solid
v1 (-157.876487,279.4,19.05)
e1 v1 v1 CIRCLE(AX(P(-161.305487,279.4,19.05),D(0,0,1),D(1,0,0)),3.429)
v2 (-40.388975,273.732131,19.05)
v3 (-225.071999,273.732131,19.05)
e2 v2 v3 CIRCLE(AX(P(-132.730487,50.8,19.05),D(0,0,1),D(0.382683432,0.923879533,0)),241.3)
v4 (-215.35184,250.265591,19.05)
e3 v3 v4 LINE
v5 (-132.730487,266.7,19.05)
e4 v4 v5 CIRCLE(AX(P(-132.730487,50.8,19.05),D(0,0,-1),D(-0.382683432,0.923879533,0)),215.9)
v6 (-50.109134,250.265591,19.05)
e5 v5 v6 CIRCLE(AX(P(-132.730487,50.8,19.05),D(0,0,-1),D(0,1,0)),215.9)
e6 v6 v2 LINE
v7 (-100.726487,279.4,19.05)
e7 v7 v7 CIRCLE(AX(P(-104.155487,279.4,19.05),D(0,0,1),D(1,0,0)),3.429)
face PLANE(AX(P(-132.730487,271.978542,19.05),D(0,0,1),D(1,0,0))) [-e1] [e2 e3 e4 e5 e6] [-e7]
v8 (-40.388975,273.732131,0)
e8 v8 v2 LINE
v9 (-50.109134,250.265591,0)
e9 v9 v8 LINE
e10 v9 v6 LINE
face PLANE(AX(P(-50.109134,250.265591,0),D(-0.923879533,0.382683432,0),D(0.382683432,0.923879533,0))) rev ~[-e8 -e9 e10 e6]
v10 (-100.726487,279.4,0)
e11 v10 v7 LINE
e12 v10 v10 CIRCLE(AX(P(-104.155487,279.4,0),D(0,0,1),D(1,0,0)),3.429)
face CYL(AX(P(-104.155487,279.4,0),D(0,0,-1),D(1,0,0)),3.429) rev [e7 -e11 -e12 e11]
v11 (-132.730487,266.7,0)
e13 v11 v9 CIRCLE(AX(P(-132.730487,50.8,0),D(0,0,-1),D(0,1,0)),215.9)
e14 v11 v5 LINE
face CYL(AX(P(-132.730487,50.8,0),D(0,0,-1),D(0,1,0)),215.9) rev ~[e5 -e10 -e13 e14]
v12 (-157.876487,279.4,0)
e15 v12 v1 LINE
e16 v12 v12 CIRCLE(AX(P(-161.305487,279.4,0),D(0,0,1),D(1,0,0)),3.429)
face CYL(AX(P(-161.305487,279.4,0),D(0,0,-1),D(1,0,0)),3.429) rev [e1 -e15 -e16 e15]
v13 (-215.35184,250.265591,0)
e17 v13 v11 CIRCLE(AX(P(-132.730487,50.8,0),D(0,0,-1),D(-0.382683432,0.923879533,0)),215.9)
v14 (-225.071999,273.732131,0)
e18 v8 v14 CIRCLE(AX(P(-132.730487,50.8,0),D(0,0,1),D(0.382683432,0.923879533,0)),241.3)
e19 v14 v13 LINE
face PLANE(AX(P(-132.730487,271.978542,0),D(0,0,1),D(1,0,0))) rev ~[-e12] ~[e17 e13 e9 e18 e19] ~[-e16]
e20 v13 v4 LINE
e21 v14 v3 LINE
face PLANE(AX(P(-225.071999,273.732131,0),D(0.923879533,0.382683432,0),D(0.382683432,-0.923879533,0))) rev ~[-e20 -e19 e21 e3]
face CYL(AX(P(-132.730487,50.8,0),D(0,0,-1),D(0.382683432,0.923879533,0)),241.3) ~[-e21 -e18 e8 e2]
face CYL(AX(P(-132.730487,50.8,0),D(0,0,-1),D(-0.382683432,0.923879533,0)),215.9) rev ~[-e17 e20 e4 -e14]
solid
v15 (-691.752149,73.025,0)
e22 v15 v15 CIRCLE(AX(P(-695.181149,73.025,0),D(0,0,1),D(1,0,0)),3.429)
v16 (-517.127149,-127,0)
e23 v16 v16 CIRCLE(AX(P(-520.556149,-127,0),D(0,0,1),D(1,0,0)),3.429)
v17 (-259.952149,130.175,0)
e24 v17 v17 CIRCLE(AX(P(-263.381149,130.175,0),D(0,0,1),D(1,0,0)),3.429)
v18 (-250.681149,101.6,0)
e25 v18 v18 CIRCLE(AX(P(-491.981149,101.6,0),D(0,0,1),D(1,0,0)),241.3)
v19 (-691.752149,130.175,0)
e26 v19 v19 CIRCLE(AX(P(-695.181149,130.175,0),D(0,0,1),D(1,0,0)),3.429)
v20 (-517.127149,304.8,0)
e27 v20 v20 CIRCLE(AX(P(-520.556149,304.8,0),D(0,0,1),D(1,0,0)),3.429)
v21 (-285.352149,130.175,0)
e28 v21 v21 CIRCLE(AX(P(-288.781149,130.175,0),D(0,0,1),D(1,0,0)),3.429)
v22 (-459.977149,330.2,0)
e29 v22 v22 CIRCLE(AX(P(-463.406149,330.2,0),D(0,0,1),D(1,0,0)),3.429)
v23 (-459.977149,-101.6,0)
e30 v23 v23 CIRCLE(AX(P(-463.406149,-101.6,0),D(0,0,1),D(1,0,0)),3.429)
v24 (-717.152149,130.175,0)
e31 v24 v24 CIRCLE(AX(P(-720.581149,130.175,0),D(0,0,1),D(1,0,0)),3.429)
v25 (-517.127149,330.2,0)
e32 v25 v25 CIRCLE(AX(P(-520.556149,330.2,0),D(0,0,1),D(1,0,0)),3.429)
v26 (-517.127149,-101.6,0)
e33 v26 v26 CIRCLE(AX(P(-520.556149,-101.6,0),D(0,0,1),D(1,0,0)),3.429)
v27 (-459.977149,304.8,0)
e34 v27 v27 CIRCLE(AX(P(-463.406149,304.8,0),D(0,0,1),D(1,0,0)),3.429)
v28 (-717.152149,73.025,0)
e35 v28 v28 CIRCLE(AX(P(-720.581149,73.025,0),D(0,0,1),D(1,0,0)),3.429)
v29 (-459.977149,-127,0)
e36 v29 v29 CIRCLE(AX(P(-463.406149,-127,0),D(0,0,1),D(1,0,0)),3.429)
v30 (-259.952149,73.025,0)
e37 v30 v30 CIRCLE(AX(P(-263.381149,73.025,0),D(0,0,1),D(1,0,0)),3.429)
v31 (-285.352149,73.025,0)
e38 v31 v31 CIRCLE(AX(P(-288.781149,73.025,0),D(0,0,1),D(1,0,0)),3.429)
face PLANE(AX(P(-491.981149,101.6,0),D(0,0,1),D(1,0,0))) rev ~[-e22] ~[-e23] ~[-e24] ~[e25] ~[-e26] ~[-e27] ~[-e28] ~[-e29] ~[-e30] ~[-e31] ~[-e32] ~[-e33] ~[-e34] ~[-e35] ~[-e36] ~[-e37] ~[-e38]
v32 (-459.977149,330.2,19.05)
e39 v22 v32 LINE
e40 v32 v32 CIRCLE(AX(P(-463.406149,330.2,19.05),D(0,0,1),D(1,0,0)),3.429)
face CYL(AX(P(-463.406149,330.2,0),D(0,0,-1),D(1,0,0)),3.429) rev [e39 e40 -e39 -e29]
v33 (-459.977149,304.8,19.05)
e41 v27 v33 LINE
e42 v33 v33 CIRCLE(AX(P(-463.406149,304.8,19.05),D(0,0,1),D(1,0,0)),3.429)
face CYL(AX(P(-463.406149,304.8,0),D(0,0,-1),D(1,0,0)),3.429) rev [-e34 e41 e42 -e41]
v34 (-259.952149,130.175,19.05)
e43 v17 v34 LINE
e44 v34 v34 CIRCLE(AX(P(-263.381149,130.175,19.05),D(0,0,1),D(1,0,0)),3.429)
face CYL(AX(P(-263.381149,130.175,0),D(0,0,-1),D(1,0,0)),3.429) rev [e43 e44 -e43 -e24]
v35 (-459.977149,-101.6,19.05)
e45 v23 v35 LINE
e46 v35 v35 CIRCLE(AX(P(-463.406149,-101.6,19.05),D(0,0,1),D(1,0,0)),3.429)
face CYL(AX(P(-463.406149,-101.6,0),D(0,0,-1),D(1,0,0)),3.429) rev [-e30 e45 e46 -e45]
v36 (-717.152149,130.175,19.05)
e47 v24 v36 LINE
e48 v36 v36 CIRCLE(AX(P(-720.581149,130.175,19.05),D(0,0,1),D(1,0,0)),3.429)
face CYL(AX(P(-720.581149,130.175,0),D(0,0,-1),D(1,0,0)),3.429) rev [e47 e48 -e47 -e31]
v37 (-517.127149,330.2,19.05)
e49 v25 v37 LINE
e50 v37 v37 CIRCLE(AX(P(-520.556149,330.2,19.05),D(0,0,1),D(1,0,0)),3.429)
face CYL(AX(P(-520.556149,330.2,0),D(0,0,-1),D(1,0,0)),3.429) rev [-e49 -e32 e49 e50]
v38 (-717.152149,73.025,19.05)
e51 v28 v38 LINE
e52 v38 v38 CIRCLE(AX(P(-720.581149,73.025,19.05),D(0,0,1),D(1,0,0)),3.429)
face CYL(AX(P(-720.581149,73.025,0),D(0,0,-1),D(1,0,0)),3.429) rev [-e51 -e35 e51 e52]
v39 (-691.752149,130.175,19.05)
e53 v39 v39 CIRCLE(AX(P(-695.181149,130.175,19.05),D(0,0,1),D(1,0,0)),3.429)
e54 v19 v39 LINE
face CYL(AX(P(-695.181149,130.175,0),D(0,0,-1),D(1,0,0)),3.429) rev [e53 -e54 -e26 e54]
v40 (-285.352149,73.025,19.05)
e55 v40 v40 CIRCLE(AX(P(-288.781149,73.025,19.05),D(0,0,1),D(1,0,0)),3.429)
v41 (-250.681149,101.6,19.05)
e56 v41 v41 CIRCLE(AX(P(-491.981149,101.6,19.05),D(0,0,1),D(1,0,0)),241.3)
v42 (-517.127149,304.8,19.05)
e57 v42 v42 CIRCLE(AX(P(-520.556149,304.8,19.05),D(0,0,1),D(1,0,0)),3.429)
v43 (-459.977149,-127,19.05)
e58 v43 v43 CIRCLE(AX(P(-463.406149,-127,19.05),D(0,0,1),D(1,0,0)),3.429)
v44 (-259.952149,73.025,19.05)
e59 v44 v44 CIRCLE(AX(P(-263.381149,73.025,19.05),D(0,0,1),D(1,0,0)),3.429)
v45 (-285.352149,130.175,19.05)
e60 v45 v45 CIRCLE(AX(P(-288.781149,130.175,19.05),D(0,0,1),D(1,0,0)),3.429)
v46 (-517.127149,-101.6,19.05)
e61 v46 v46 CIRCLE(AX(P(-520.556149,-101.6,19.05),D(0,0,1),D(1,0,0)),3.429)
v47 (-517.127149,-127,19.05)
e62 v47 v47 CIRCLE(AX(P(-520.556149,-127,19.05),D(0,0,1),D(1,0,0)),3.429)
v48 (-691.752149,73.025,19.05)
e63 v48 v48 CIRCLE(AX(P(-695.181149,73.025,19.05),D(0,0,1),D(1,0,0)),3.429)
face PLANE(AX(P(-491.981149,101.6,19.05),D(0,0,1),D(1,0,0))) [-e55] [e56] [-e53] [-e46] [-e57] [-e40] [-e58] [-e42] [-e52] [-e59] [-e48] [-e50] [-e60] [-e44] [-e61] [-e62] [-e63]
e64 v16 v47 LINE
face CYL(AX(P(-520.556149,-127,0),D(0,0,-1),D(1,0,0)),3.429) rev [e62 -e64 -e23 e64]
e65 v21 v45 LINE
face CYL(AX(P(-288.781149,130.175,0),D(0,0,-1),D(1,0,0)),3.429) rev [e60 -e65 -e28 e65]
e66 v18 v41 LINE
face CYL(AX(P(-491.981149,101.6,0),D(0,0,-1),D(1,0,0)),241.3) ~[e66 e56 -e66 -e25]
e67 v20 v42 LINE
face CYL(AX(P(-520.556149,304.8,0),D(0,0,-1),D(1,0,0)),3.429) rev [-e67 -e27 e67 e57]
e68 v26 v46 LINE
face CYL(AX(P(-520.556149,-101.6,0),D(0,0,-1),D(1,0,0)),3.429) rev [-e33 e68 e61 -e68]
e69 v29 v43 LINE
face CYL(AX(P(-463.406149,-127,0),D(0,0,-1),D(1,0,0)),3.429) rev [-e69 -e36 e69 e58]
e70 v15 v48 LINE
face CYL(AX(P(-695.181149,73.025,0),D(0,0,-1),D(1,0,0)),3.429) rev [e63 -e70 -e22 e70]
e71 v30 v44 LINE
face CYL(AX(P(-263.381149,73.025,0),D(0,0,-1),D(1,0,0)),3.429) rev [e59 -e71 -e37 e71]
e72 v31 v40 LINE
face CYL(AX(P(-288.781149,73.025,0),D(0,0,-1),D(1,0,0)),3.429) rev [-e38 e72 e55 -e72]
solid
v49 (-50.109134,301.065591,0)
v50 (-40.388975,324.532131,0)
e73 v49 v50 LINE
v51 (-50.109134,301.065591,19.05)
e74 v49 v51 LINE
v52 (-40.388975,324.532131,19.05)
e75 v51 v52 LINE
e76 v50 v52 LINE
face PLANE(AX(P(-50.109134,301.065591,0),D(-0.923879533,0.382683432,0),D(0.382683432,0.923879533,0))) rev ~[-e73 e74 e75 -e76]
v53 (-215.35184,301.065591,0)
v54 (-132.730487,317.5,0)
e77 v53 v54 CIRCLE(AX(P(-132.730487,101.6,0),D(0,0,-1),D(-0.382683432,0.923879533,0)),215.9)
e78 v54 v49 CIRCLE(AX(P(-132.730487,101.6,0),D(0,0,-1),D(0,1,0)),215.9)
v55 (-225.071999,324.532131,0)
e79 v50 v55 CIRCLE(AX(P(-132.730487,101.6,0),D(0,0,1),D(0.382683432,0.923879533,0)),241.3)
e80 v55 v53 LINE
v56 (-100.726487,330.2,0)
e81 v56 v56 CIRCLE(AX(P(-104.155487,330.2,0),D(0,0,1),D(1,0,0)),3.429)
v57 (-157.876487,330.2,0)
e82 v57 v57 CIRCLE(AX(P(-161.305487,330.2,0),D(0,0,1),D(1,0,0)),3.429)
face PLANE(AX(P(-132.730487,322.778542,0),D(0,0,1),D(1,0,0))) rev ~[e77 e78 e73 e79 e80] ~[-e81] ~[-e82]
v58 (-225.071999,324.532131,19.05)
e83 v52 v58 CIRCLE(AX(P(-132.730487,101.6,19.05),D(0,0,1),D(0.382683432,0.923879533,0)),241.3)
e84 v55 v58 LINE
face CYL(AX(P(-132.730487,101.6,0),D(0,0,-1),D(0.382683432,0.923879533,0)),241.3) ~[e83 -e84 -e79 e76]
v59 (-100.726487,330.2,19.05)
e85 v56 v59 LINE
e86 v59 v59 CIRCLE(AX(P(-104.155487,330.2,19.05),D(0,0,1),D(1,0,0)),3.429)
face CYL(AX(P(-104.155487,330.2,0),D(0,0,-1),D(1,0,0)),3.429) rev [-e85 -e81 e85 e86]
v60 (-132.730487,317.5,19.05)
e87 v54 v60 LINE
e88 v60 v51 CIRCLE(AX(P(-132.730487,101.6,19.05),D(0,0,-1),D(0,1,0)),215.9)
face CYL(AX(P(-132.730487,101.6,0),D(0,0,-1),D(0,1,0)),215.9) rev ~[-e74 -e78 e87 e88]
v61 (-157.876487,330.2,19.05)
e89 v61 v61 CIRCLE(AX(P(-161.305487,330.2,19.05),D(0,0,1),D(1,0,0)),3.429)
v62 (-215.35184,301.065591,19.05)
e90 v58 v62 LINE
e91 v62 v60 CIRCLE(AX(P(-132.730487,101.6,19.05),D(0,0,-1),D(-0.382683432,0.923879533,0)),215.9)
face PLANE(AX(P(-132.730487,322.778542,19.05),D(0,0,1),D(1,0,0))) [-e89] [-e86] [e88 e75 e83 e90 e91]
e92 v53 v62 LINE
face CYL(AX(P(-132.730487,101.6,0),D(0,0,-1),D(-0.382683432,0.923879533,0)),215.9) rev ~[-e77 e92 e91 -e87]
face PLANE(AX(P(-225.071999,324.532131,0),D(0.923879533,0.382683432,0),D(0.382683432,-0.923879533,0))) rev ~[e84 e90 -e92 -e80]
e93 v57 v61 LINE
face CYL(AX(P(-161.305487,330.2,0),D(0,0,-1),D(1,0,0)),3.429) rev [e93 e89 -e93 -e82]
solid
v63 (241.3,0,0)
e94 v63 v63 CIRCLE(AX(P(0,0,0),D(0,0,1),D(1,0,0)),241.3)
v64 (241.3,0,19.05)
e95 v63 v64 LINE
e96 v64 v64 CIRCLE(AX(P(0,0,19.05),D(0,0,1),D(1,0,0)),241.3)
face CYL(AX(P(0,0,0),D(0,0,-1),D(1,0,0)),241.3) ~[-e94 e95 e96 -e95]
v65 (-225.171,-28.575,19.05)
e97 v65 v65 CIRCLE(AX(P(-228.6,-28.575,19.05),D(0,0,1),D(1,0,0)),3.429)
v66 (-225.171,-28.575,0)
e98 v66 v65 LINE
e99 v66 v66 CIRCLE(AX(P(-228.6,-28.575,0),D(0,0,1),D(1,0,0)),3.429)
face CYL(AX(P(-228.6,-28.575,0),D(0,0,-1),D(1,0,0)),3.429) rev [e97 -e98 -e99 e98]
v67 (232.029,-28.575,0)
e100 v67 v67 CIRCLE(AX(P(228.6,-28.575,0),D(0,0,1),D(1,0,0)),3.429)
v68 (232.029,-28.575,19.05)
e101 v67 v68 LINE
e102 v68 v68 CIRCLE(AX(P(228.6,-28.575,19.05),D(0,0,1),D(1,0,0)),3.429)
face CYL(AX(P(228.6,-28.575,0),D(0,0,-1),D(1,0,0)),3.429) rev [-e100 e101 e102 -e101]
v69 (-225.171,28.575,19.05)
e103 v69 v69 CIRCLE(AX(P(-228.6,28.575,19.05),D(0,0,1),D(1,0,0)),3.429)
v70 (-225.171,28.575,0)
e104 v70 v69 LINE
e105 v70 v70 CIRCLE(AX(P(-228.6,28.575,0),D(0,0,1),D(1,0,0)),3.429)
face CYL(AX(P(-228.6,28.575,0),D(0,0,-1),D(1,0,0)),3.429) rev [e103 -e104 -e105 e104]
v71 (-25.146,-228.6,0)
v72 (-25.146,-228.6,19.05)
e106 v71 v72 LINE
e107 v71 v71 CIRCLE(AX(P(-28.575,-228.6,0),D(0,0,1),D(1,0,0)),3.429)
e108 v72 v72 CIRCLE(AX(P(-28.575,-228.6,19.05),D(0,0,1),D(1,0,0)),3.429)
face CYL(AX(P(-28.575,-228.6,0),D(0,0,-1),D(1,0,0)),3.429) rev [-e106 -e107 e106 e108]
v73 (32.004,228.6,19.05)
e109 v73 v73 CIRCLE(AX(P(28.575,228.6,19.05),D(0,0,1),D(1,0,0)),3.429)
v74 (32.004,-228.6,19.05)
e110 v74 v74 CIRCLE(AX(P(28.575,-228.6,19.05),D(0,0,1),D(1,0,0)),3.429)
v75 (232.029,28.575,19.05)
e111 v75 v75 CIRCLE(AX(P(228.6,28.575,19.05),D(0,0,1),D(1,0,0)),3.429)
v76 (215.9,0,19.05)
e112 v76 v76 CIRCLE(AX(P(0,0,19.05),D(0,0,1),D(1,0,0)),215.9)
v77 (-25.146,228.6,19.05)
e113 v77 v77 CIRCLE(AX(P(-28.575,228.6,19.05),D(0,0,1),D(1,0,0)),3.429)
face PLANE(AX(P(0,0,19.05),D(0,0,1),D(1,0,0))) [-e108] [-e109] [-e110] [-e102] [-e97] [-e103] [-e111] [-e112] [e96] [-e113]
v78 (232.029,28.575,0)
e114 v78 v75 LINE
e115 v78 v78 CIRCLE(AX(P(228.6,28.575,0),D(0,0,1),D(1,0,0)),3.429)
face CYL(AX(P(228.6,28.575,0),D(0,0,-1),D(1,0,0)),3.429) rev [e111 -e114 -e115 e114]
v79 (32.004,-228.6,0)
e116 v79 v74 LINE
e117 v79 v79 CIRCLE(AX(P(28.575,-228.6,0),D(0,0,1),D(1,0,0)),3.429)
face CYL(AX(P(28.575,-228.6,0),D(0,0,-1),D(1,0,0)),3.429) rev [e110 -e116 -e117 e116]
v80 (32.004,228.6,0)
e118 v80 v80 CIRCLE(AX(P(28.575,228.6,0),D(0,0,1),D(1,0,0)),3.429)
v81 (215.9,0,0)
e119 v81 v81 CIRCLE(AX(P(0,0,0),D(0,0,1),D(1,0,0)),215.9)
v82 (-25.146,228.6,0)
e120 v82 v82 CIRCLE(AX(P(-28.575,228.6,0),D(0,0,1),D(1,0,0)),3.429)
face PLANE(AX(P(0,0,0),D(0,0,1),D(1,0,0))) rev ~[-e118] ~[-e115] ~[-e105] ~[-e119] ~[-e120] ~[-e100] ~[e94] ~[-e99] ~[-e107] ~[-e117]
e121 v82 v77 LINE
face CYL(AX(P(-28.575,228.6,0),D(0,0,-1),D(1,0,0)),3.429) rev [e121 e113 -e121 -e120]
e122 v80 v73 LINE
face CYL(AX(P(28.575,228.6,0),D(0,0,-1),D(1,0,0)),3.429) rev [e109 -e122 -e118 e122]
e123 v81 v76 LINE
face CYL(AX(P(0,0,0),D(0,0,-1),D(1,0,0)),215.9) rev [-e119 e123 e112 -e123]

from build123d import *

# Parameters (mm, degrees)
F0_R     = 241.3
F0_R_2   = 3.429
F1_DEPTH = 19.05
F0_R_3   = 215.9


# Not quite as in the source:
# - a feature names something its author has since deleted; it is built from what else it names


with BuildPart() as f1:
    # F0 (on Top) → F1 (new body)
    with BuildSketch(Plane.XY):
        with Locations((-491.9811487198, 101.6)):
            Circle(F0_R)
        with Locations((-520.5561487198, -127)):
            Circle(F0_R_2, mode=Mode.SUBTRACT)
        with Locations((-520.5561487198, -101.6)):
            Circle(F0_R_2, mode=Mode.SUBTRACT)
        with Locations((-463.4061487198, -127)):
            Circle(F0_R_2, mode=Mode.SUBTRACT)
        with Locations((-463.4061487198, -101.6)):
            Circle(F0_R_2, mode=Mode.SUBTRACT)
        with Locations((-720.5811487198, 73.025)):
            Circle(F0_R_2, mode=Mode.SUBTRACT)
        with Locations((-695.1811487198, 73.025)):
            Circle(F0_R_2, mode=Mode.SUBTRACT)
        with Locations((-720.5811487198, 130.175)):
            Circle(F0_R_2, mode=Mode.SUBTRACT)
        with Locations((-695.1811487198, 130.175)):
            Circle(F0_R_2, mode=Mode.SUBTRACT)
        with Locations((-288.7811487198, 73.025)):
            Circle(F0_R_2, mode=Mode.SUBTRACT)
        with Locations((-263.3811487198, 73.025)):
            Circle(F0_R_2, mode=Mode.SUBTRACT)
        with Locations((-288.7811487198, 130.175)):
            Circle(F0_R_2, mode=Mode.SUBTRACT)
        with Locations((-263.3811487198, 130.175)):
            Circle(F0_R_2, mode=Mode.SUBTRACT)
        with Locations((-520.5561487198, 304.8)):
            Circle(F0_R_2, mode=Mode.SUBTRACT)
        with Locations((-520.5561487198, 330.2)):
            Circle(F0_R_2, mode=Mode.SUBTRACT)
        with Locations((-463.4061487198, 304.8)):
            Circle(F0_R_2, mode=Mode.SUBTRACT)
        with Locations((-463.4061487198, 330.2)):
            Circle(F0_R_2, mode=Mode.SUBTRACT)
    extrude(amount=F1_DEPTH)


with BuildPart() as f1b:
    # F0 (on Top) → F1, piece 2 (new body)
    with BuildSketch(Plane.XY):
        with BuildLine():
            ThreePointArc((-132.7304871559, 342.9), (-179.8057818584, 338.2634881613), (-225.0719993856, 324.532131195))
            Line((-225.0719993856, 324.532131195), (-215.3518402035, 301.0655910692))
            ThreePointArc((-215.3518402035, 301.0655910692), (-174.8504876792, 313.3515420391), (-132.7304871559, 317.5))
            ThreePointArc((-132.7304871559, 317.5), (-90.6104866326, 313.3515420391), (-50.1091341083, 301.0655910692))
            Line((-50.1091341083, 301.0655910692), (-40.3889749262, 324.532131195))
            ThreePointArc((-40.3889749262, 324.532131195), (-85.6551924534, 338.2634881613), (-132.7304871559, 342.9))
        make_face()
        with Locations((-161.3054871559, 330.2)):
            Circle(F0_R_2, mode=Mode.SUBTRACT)
        with Locations((-104.1554871559, 330.2)):
            Circle(F0_R_2, mode=Mode.SUBTRACT)
    extrude(amount=F1_DEPTH)


with BuildPart() as f1c:
    # F0 (on Top) → F1, piece 3 (new body)
    with BuildSketch(Plane.XY):
        with BuildLine():
            ThreePointArc((-132.7304871559, 292.1), (-179.8057818584, 287.4634881613), (-225.0719993856, 273.732131195))
            Line((-225.0719993856, 273.732131195), (-215.3518402035, 250.2655910692))
            ThreePointArc((-215.3518402035, 250.2655910692), (-174.8504876792, 262.5515420391), (-132.7304871559, 266.7))
            ThreePointArc((-132.7304871559, 266.7), (-90.6104866326, 262.5515420391), (-50.1091341083, 250.2655910692))
            Line((-50.1091341083, 250.2655910692), (-40.3889749262, 273.732131195))
            ThreePointArc((-40.3889749262, 273.732131195), (-85.6551924534, 287.4634881613), (-132.7304871559, 292.1))
        make_face()
        with Locations((-161.3054871559, 279.4)):
            Circle(F0_R_2, mode=Mode.SUBTRACT)
        with Locations((-104.1554871559, 279.4)):
            Circle(F0_R_2, mode=Mode.SUBTRACT)
    extrude(amount=F1_DEPTH)


with BuildPart() as f1d:
    # F0 (on Top) → F1, piece 4 (new body)
    with BuildSketch(Plane.XY):
        Circle(F0_R)
        with Locations((-28.575, -228.6)):
            Circle(F0_R_2, mode=Mode.SUBTRACT)
        with Locations((28.575, -228.6)):
            Circle(F0_R_2, mode=Mode.SUBTRACT)
        with Locations((-228.6, -28.575)):
            Circle(F0_R_2, mode=Mode.SUBTRACT)
        with Locations((-228.6, 28.575)):
            Circle(F0_R_2, mode=Mode.SUBTRACT)
        with Locations((228.6, -28.575)):
            Circle(F0_R_2, mode=Mode.SUBTRACT)
        Circle(F0_R_3, mode=Mode.SUBTRACT)
        with Locations((228.6, 28.575)):
            Circle(F0_R_2, mode=Mode.SUBTRACT)
        with Locations((-28.575, 228.6)):
            Circle(F0_R_2, mode=Mode.SUBTRACT)
        with Locations((28.575, 228.6)):
            Circle(F0_R_2, mode=Mode.SUBTRACT)
    extrude(amount=F1_DEPTH)


solid = Compound([f1.part, f1b.part, f1c.part, f1d.part])
